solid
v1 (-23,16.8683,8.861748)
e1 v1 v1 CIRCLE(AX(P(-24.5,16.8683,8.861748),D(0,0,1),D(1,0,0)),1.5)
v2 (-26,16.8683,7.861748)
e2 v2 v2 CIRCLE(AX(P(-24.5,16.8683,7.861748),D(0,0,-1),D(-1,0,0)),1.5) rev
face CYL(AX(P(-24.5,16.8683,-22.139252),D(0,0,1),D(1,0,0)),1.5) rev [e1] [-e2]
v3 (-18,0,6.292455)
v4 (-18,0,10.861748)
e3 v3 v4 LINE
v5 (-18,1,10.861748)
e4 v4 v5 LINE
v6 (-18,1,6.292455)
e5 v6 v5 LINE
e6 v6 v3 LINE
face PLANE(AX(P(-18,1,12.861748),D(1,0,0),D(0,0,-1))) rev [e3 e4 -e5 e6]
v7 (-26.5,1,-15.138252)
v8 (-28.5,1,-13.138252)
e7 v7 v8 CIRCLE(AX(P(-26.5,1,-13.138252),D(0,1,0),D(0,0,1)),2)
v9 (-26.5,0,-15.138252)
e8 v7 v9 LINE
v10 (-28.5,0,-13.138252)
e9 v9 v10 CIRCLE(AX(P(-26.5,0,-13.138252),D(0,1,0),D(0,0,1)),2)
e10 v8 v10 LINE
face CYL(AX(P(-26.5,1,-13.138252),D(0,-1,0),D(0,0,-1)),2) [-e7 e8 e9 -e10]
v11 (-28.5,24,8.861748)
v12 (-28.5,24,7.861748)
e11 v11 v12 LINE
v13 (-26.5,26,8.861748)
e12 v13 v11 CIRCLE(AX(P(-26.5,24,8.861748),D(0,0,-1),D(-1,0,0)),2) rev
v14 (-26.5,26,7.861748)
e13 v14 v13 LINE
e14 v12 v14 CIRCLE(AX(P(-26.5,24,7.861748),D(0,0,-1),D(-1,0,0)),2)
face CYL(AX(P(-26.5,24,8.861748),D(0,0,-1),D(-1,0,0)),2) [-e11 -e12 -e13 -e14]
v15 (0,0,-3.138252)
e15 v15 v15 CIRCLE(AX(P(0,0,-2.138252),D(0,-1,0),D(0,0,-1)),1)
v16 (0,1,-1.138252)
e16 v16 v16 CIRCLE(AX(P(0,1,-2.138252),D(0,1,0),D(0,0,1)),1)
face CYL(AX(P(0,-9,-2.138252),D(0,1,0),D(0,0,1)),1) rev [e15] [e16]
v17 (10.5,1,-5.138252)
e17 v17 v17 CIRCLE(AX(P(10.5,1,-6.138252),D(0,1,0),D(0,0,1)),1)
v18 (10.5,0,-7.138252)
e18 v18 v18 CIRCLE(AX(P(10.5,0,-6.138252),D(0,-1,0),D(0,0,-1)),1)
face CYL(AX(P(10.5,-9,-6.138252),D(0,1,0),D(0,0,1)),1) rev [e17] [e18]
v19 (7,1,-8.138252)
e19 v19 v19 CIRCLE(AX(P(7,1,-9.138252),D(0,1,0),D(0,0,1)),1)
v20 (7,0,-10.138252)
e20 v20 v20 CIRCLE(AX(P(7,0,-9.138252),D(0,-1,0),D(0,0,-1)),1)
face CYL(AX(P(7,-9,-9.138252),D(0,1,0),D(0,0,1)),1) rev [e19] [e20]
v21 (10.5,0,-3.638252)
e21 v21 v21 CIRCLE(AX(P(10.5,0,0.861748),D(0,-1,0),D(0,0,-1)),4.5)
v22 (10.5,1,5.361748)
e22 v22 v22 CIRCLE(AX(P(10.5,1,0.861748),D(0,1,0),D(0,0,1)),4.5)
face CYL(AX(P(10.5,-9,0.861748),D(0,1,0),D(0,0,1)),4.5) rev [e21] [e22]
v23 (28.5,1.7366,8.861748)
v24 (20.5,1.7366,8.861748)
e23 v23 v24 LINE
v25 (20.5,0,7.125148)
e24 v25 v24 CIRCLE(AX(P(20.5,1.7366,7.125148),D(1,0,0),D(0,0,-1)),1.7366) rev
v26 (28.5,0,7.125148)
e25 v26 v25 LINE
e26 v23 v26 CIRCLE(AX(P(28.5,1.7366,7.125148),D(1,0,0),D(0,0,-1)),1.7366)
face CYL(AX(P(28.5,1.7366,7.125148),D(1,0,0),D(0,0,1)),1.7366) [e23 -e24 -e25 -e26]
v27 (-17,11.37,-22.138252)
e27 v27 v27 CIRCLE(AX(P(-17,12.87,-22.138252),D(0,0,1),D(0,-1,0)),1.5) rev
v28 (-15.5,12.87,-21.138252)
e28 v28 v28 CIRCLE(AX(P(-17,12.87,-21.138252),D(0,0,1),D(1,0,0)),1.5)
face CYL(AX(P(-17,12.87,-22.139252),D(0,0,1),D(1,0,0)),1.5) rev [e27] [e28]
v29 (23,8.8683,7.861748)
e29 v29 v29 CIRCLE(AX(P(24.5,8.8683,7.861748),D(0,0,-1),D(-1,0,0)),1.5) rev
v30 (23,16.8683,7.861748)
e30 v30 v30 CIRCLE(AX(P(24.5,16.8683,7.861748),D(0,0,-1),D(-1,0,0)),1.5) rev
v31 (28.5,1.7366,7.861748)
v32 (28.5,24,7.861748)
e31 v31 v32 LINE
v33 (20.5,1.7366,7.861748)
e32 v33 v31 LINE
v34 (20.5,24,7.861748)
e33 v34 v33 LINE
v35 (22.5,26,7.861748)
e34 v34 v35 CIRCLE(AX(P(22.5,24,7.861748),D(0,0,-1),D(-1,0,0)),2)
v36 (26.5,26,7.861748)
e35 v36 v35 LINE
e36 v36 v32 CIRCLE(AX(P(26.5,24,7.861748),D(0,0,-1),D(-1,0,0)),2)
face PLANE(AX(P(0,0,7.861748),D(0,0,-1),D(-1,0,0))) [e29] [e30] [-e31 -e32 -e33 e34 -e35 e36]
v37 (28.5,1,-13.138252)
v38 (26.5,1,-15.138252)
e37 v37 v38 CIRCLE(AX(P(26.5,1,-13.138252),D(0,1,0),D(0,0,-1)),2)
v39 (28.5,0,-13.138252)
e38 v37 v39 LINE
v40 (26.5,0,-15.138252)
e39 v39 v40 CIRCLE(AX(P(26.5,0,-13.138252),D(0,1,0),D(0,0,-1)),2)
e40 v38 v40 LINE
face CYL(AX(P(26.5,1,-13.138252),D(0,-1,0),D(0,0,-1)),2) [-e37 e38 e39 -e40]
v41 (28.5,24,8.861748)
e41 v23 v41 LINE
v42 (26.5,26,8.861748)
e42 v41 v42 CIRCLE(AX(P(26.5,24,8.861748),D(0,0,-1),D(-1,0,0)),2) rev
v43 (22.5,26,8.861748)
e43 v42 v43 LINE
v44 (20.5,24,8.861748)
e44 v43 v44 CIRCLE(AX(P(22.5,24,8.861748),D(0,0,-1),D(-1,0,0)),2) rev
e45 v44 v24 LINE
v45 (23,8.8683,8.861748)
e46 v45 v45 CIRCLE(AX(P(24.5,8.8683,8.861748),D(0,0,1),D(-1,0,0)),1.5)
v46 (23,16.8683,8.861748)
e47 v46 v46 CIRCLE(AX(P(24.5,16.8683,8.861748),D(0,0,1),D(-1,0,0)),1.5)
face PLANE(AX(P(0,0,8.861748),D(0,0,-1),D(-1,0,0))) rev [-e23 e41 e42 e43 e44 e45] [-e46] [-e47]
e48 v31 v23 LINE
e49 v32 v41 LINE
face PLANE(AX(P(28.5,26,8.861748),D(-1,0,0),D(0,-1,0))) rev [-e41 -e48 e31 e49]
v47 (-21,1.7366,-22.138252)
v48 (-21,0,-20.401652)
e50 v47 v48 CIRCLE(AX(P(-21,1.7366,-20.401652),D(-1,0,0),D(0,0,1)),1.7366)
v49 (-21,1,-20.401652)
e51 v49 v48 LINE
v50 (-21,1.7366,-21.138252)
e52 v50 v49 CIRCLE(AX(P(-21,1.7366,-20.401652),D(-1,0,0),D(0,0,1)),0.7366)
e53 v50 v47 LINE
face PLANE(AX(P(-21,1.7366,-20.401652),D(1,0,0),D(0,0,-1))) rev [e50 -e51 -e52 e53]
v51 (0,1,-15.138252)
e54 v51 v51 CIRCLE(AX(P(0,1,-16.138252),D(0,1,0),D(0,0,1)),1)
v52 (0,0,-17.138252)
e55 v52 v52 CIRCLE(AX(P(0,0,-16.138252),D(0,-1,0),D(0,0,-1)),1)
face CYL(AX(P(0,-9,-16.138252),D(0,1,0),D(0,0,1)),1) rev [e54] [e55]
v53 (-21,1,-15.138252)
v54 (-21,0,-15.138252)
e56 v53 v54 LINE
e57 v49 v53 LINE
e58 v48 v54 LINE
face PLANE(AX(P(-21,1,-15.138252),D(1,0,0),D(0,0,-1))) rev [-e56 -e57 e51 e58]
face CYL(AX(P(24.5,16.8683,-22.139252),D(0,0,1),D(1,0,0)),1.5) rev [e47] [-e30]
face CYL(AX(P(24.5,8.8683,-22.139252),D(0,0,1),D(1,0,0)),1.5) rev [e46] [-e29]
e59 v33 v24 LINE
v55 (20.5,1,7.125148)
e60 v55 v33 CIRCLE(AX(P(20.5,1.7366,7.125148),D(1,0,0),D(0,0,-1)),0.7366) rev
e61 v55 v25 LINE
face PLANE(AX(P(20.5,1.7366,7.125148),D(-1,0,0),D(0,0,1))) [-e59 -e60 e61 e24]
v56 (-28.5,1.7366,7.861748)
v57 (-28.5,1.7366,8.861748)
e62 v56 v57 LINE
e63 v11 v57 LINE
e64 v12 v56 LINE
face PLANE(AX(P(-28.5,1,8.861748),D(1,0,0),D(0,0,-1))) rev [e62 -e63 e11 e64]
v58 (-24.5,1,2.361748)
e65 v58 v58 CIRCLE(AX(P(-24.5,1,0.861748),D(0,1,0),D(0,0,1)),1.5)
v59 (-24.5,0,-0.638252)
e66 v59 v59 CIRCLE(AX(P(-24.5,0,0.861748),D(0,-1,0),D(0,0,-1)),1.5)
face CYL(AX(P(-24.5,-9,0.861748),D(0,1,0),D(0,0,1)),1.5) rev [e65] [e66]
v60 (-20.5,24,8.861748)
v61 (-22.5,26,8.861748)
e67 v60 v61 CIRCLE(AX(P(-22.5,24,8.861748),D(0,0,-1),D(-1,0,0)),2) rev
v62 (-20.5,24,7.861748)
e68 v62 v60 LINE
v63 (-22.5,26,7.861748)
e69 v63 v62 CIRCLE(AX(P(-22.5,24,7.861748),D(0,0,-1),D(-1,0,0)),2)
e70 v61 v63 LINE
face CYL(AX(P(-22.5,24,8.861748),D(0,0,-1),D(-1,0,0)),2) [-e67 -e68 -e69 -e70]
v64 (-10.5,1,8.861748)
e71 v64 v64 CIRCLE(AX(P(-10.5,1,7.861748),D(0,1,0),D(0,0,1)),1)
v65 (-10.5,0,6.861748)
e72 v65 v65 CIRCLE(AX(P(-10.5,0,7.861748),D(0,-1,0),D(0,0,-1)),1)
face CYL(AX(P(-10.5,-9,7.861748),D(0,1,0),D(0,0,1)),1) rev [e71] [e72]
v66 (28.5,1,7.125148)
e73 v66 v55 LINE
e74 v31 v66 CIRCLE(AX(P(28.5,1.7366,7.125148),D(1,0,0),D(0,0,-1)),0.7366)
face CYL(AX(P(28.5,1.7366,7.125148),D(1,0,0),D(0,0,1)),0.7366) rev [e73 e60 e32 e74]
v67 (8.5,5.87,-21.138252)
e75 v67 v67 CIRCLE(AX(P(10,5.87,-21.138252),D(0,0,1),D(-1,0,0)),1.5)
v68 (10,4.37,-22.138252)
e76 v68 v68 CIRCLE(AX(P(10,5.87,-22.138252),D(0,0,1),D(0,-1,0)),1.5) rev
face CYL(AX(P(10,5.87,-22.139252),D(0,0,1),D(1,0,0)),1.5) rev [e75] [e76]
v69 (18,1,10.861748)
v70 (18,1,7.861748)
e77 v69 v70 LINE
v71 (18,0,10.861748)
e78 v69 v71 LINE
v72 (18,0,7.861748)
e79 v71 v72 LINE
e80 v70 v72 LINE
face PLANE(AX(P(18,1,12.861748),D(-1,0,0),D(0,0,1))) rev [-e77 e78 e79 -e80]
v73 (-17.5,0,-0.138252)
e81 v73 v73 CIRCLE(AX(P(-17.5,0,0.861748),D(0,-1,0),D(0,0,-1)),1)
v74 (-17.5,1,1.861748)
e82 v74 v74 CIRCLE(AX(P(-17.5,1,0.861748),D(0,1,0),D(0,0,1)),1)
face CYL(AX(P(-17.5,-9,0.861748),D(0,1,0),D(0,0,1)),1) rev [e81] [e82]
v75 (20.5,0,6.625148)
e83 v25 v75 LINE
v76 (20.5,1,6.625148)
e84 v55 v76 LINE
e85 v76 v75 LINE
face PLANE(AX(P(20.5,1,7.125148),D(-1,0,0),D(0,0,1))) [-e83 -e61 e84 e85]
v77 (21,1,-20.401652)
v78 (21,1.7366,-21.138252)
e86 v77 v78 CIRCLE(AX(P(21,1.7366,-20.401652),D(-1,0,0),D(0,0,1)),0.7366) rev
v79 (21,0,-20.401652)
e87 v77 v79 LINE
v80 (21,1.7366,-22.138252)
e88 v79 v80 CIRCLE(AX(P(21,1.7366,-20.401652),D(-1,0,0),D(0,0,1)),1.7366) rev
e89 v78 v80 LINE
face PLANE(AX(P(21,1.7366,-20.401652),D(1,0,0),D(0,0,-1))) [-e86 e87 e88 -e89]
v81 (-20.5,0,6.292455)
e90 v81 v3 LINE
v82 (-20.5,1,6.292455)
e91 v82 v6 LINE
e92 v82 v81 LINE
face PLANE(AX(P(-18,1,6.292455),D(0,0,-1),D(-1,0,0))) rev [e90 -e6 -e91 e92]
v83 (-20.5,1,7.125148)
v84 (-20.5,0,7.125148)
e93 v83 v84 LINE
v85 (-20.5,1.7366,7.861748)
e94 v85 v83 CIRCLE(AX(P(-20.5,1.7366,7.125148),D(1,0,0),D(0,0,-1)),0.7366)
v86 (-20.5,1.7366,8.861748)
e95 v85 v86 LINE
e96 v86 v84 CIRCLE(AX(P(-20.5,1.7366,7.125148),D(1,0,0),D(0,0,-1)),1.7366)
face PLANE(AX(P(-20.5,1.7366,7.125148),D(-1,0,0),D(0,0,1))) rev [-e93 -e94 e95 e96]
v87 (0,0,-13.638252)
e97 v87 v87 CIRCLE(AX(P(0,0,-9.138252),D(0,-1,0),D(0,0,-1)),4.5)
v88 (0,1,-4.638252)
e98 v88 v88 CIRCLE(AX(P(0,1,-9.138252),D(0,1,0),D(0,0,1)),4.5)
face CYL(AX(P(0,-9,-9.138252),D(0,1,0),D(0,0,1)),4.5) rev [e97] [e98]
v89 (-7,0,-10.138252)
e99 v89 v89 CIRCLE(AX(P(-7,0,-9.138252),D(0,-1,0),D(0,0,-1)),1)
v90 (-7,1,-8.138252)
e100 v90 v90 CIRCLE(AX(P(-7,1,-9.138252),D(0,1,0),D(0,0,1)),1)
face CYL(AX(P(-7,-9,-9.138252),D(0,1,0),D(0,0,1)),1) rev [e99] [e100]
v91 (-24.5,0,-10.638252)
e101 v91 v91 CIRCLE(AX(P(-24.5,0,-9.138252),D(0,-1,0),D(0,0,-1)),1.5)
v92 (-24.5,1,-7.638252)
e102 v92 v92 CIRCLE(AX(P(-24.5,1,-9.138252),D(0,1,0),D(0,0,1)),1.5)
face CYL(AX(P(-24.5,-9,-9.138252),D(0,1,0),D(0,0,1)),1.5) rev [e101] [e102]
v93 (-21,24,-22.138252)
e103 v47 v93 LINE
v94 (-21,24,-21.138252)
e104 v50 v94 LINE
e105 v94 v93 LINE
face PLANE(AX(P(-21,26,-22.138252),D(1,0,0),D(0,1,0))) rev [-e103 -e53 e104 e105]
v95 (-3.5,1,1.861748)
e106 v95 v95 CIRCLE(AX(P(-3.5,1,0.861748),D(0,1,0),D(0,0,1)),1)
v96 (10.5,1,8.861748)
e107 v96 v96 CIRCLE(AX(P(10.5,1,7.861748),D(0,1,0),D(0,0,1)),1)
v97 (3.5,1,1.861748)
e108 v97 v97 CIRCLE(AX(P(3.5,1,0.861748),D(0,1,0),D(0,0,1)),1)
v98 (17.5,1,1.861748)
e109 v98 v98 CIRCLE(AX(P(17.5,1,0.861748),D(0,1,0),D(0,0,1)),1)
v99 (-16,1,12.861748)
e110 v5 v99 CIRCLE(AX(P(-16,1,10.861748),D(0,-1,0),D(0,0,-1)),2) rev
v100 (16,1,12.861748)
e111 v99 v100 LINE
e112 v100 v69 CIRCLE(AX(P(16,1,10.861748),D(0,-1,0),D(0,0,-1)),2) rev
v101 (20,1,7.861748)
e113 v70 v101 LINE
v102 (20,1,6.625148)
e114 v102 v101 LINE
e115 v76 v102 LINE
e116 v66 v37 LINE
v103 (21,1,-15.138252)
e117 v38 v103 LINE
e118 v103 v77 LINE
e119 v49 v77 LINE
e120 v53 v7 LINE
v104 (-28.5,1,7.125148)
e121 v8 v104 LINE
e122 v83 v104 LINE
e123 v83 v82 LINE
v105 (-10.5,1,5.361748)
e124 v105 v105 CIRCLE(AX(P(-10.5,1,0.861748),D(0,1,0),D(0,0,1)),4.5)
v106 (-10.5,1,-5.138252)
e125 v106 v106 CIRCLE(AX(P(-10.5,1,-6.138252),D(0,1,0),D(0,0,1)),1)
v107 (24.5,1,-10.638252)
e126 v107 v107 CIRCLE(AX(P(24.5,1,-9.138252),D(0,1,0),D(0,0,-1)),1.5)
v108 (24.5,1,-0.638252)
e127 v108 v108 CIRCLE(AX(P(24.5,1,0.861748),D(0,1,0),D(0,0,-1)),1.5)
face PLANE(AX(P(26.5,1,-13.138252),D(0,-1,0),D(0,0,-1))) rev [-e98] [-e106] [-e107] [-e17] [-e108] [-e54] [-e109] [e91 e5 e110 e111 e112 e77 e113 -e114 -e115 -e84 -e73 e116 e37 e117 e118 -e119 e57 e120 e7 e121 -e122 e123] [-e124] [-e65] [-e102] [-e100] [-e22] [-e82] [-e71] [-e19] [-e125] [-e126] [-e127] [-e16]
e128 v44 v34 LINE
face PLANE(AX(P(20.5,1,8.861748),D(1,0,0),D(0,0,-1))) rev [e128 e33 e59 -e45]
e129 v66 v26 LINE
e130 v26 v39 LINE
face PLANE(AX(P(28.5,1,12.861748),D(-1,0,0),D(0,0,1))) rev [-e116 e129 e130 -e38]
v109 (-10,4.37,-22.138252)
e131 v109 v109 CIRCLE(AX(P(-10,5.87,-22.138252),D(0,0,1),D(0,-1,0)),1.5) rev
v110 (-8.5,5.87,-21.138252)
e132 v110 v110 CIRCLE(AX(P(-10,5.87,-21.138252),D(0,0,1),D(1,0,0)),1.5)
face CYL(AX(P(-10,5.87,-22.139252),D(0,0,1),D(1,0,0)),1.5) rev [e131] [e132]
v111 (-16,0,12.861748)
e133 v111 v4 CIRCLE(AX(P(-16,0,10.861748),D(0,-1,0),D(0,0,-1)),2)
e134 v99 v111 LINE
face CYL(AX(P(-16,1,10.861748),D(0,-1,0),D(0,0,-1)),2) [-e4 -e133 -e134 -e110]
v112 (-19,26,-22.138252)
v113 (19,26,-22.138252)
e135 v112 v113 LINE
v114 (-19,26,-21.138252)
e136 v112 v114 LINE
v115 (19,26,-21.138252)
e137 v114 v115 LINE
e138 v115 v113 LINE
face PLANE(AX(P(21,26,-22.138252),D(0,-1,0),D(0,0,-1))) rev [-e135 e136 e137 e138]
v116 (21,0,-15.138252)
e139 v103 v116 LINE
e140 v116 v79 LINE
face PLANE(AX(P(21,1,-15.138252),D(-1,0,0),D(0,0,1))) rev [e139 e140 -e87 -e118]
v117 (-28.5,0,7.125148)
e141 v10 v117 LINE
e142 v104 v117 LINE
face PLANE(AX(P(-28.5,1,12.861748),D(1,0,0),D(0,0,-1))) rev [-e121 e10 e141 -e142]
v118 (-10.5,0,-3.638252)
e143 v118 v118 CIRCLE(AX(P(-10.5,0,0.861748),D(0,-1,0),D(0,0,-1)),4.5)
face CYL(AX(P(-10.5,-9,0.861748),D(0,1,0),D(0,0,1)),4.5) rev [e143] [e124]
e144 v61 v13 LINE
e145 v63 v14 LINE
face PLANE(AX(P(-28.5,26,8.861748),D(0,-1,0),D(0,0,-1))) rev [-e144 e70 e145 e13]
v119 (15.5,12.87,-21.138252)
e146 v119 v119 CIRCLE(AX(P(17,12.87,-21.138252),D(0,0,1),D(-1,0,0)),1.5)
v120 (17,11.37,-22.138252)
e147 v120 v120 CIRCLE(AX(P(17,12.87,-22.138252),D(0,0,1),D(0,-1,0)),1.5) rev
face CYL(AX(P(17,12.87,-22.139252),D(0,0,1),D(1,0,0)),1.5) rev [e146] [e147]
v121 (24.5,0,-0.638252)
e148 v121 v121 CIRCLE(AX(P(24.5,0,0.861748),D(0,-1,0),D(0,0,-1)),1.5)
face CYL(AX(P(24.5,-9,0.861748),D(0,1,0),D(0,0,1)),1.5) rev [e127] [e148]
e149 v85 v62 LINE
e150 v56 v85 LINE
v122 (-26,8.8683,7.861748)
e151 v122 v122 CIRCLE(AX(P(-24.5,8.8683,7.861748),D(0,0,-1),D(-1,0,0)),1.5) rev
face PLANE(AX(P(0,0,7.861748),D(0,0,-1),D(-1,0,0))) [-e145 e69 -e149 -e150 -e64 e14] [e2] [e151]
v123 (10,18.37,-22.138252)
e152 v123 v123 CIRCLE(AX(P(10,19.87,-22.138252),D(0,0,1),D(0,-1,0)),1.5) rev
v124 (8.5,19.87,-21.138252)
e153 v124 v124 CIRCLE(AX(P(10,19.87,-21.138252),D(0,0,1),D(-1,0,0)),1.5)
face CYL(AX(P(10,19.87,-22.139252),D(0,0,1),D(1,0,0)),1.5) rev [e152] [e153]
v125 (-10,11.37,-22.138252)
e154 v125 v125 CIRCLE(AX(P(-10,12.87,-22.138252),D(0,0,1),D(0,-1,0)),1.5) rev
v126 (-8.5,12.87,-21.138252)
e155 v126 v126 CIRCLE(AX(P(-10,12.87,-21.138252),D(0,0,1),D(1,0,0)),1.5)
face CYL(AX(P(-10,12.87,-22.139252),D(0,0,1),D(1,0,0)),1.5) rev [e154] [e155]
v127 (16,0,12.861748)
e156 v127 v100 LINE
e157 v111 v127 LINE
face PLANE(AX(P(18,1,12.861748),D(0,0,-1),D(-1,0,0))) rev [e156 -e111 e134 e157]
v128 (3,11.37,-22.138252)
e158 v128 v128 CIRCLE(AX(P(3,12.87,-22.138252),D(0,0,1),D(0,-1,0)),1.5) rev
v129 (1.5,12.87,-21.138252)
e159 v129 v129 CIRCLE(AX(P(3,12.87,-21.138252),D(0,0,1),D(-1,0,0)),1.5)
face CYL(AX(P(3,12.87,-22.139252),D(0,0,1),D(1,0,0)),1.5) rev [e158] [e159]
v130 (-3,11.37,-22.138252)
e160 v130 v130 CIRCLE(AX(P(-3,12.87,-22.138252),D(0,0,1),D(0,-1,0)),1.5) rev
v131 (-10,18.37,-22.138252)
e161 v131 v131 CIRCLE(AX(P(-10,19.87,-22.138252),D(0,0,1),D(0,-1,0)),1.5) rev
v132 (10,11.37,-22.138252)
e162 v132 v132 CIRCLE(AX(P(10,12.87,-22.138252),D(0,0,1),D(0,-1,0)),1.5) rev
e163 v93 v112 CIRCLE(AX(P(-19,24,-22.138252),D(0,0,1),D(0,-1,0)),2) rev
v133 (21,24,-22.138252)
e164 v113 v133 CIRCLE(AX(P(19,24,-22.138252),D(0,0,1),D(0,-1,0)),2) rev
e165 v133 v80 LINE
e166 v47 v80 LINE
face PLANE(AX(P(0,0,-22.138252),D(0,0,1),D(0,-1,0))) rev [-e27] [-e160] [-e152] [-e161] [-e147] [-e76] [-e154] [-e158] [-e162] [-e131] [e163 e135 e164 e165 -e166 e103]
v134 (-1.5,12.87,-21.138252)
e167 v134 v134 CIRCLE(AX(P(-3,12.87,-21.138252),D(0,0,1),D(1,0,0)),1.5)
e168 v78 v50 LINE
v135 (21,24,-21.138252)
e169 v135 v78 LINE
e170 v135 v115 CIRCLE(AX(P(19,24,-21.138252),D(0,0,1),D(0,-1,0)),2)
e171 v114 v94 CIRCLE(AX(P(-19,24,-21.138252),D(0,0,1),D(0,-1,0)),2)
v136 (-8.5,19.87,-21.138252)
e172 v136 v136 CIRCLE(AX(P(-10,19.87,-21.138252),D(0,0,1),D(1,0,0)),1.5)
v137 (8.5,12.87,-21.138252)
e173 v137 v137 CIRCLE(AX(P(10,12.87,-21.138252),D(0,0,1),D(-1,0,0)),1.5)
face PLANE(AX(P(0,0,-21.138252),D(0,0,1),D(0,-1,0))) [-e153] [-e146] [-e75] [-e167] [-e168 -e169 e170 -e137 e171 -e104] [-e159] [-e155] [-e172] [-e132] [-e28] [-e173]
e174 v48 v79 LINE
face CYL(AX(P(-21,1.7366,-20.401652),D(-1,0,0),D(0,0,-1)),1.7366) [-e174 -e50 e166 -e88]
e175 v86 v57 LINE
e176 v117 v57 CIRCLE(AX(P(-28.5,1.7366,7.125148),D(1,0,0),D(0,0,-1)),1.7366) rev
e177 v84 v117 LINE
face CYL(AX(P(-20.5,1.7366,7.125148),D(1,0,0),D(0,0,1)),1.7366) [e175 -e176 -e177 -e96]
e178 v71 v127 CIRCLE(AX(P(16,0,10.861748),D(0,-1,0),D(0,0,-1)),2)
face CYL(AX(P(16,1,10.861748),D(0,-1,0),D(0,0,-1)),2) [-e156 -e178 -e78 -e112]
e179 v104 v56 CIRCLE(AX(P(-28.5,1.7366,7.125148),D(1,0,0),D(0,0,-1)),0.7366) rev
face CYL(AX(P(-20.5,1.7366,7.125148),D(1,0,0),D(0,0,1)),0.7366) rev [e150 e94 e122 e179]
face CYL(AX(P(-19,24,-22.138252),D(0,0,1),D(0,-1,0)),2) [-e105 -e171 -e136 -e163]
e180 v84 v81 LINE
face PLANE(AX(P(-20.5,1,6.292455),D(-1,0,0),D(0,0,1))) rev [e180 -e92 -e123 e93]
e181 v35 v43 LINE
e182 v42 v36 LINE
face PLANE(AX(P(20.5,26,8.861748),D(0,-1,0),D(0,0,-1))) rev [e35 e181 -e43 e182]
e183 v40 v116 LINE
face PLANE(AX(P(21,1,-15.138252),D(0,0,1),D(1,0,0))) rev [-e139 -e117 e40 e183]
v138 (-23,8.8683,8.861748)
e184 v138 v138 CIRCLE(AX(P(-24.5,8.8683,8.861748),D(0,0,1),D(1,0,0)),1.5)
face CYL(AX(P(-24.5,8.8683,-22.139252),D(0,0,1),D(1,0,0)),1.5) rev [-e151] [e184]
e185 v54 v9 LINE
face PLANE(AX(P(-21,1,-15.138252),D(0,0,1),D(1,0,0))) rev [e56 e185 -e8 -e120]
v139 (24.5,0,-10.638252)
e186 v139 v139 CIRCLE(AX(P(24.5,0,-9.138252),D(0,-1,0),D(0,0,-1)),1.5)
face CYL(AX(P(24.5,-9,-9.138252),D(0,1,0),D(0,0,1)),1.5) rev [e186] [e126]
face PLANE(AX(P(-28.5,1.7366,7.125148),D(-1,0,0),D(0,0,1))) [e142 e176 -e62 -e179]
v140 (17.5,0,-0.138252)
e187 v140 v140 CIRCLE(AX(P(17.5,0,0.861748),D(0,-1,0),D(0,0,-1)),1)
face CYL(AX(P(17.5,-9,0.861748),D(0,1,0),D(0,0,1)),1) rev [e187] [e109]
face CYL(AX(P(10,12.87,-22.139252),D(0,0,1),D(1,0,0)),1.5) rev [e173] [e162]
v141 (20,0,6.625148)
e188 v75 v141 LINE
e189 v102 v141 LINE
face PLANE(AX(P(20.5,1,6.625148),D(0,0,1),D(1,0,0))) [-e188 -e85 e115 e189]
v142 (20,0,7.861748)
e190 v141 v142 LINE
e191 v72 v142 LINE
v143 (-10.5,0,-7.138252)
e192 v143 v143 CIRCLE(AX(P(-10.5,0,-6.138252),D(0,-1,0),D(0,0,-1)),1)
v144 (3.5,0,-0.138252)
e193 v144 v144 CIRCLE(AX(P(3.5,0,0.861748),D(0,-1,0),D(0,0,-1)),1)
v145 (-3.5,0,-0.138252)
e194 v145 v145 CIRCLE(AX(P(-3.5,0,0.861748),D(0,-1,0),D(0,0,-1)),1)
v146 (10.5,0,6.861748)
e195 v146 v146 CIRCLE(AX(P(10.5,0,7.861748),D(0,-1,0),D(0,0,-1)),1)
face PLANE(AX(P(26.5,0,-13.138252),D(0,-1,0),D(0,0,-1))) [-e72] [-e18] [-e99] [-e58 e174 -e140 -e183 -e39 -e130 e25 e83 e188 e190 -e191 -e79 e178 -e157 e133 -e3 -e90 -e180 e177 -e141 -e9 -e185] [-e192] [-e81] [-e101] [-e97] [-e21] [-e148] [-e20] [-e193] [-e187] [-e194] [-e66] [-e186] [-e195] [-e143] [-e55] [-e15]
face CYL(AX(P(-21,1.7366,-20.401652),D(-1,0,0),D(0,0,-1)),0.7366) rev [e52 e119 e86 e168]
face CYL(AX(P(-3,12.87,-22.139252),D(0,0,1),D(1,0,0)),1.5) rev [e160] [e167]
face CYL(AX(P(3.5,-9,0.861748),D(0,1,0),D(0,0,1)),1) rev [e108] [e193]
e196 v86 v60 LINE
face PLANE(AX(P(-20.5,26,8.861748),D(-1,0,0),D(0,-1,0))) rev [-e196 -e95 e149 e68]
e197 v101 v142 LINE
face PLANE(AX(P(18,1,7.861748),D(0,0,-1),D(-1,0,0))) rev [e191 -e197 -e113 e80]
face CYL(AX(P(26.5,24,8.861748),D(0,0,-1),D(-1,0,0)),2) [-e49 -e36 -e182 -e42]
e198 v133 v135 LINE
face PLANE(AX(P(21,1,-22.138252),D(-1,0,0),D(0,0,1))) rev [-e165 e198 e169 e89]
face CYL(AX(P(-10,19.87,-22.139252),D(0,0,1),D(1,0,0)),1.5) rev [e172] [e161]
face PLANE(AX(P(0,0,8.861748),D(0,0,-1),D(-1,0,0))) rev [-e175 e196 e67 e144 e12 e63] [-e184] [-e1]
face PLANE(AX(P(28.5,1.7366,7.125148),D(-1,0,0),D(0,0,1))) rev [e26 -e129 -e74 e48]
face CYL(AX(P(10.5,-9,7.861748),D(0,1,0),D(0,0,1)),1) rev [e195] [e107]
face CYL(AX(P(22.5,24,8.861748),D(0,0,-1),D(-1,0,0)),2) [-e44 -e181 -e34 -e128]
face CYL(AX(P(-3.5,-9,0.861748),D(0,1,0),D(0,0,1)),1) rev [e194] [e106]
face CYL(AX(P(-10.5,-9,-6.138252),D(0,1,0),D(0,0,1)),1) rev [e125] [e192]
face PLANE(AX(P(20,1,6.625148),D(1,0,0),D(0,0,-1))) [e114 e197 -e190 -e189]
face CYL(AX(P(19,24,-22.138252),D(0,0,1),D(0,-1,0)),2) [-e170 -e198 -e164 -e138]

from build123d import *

# Parameters (mm, degrees)
BASE_FLANGE1_DEPTH             = 1
SKETCH15_R                     = 4.5
SKETCH15_R_2                   = 1
SKETCH15_R_3                   = 1.5
CUT_EXTRUDE1_DEPTH             = 10
EDGE_FLANGE2_STRIP_W           = 5.4732
EDGE_FLANGE2_STRIP_H           = 1
EDGE_FLANGE2_STRIP_CUT_DEPTH   = 42
EDGE_FLANGE2_DEPTH             = 42
EDGE_FLANGE3_STRIP_W           = 9.4732
EDGE_FLANGE3_STRIP_H           = 1
EDGE_FLANGE3_STRIP_CUT_DEPTH   = 8
EDGE_FLANGE3_STRIP_2_W         = 9.4732
EDGE_FLANGE3_STRIP_2_H         = 1
EDGE_FLANGE3_STRIP_CUT_2_DEPTH = 8
EDGE_FLANGE3_RELIEF_W          = 9.9732
EDGE_FLANGE3_RELIEF_H          = 0.5
EDGE_FLANGE3_RELIEF_CUT_DEPTH  = 1
EDGE_FLANGE3_DEPTH             = 8
EDGE_FLANGE3_BEND_DEPTH        = 8
FILLET2_R                      = 2
CUT_EXTRUDE2_REACH             = 53.422
SKETCH51_R                     = 1.5
CUT_EXTRUDE3_REACH             = 51.49
SKETCH52_R                     = 1.5


# Sheet-metal steps are written as plain solids
with BuildPart() as part:
    # Sketch1 → Base-Flange1 (new body)
    with BuildSketch(Plane(origin=(0, 0, 0), x_dir=(1, 0, 0), z_dir=(0, 1, 0))):
        with BuildLine():
            Line((28.5, -12.861747752), (20.5, -12.861747752))
            Line((20.5, -12.861747752), (20.5, -7.861747752))
            Line((20.5, -7.861747752), (18, -7.861747752))
            Line((18, -7.861747752), (18, -12.861747752))
            Line((18, -12.861747752), (-18, -12.861747752))
            Line((-18, -12.861747752), (-18, -6.292454879))
            Line((-18, -6.292454879), (-20.5, -6.292454879))
            Line((-20.5, -6.292454879), (-20.5, -12.861747752))
            Line((-20.5, -12.861747752), (-28.5, -12.861747752))
            Line((-28.5, -12.861747752), (-28.5, 13.138252248))
            ThreePointArc((-28.5, 13.138252248), (-27.914213562, 14.552465811), (-26.5, 15.138252248))
            Line((-26.5, 15.138252248), (-21, 15.138252248))
            Line((-21, 15.138252248), (-21, 22.138252248))
            Line((-21, 22.138252248), (21, 22.138252248))
            Line((21, 22.138252248), (21, 15.138252248))
            Line((21, 15.138252248), (26.5, 15.138252248))
            ThreePointArc((26.5, 15.138252248), (27.914213562, 14.552465811), (28.5, 13.138252248))
            Line((28.5, 13.138252248), (28.5, -12.861747752))
        make_face()
    extrude(amount=BASE_FLANGE1_DEPTH)

    # Sketch15 → Cut-Extrude1 (cut)
    with BuildSketch(Plane(origin=(0, 1, 0), x_dir=(1, 0, 0), z_dir=(0, 1, 0))):
        with Locations(Location((-10.5, -0.861747752, 0), (0, 0, 270))):
            Circle(SKETCH15_R)
        with Locations(Location((10.5, -0.861747752, 0), (0, 0, 270))):
            Circle(SKETCH15_R)
        with Locations(Location((-10.5, 6.138252248, 0), (0, 0, 270))):
            Circle(SKETCH15_R_2)
        with Locations(Location((-10.5, -7.861747752, 0), (0, 0, 270))):
            Circle(SKETCH15_R_2)
        with Locations(Location((-17.5, -0.861747752, 0), (0, 0, 270))):
            Circle(SKETCH15_R_2)
        with Locations(Location((-3.5, -0.861747752, 0), (0, 0, 270))):
            Circle(SKETCH15_R_2)
        with Locations(Location((3.5, -0.861747752, 0), (0, 0, 270))):
            Circle(SKETCH15_R_2)
        with Locations(Location((17.5, -0.861747752, 0), (0, 0, 270))):
            Circle(SKETCH15_R_2)
        with Locations(Location((10.5, -7.861747752, 0), (0, 0, 270))):
            Circle(SKETCH15_R_2)
        with Locations(Location((10.5, 6.138252248, 0), (0, 0, 270))):
            Circle(SKETCH15_R_2)
        with Locations(Location((0, 9.138252248, 0), (0, 0, 270))):
            Circle(SKETCH15_R)
        with Locations(Location((0, 2.138252248, 0), (0, 0, 270))):
            Circle(SKETCH15_R_2)
        with Locations(Location((-7, 9.138252248, 0), (0, 0, 270))):
            Circle(SKETCH15_R_2)
        with Locations(Location((7, 9.138252248, 0), (0, 0, 270))):
            Circle(SKETCH15_R_2)
        with Locations(Location((0, 16.138252248, 0), (0, 0, 270))):
            Circle(SKETCH15_R_2)
        with Locations(Location((-24.5, 9.138252248, 0), (0, 0, 270))):
            Circle(SKETCH15_R_3)
        with Locations(Location((-24.5, -0.861747752, 0), (0, 0, 270))):
            Circle(SKETCH15_R_3)
        with Locations(Location((24.5, -0.861747752, 0), (0, 0, 90))):
            Circle(SKETCH15_R_3)
        with Locations(Location((24.5, 9.138252248, 0), (0, 0, 90))):
            Circle(SKETCH15_R_3)
    extrude(amount=-CUT_EXTRUDE1_DEPTH, mode=Mode.SUBTRACT)

    # Edge-Flange2 strip (across the edge) → Edge-Flange2 strip cut (cut)
    with BuildSketch(Plane(origin=(21, 1, -22.138252248), x_dir=(0, 0, 1), z_dir=(-1, 0, 0))):
        with Locations((-1, -0.5)):
            Rectangle(EDGE_FLANGE2_STRIP_W, EDGE_FLANGE2_STRIP_H)
    extrude(amount=EDGE_FLANGE2_STRIP_CUT_DEPTH, mode=Mode.SUBTRACT)

    # Edge-Flange2 section (across the edge) → Edge-Flange2 (add)
    with BuildSketch(Plane(origin=(21, 1, -22.138252248), x_dir=(0, 0, 1), z_dir=(-1, 0, 0))):
        with BuildLine():
            Line((0, 0.7366), (0, 25))
            Line((0, 25), (1, 25))
            Line((1, 25), (1, 0.7366))
            ThreePointArc((1, 0.7366), (1.215745145, 0.215745145), (1.7366, 0))
            Line((1.7366, 0), (1.7366, -1))
            ThreePointArc((1.7366, -1), (0.508638364, -0.491361636), (0, 0.7366))
        make_face()
    extrude(amount=EDGE_FLANGE2_DEPTH)

    # Edge-Flange3 strip (across the edge) → Edge-Flange3 strip cut (cut)
    with BuildSketch(Plane(origin=(-28.5, 1, 8.861747752), x_dir=(0, 0, -1), z_dir=(1, 0, 0))):
        with Locations((-3, -0.5)):
            Rectangle(EDGE_FLANGE3_STRIP_W, EDGE_FLANGE3_STRIP_H)
    extrude(amount=EDGE_FLANGE3_STRIP_CUT_DEPTH, mode=Mode.SUBTRACT)

    # Edge-Flange3 strip 2 (across the edge) → Edge-Flange3 strip cut 2 (cut)
    with BuildSketch(Plane(origin=(20.5, 1, 8.861747752), x_dir=(0, 0, -1), z_dir=(1, 0, 0))):
        with Locations((-3, -0.5)):
            Rectangle(EDGE_FLANGE3_STRIP_2_W, EDGE_FLANGE3_STRIP_2_H)
    extrude(amount=EDGE_FLANGE3_STRIP_CUT_2_DEPTH, mode=Mode.SUBTRACT)

    # Edge-Flange3 relief (on the sheet) → Edge-Flange3 relief cut (cut)
    with BuildSketch(Plane(origin=(20.5, 1, 7.125147752), x_dir=(0, 0, -1), z_dir=(0, 1, 0))):
        with Locations((-4.4866, 0.25)):
            Rectangle(EDGE_FLANGE3_RELIEF_W, EDGE_FLANGE3_RELIEF_H)
    extrude(amount=-EDGE_FLANGE3_RELIEF_CUT_DEPTH, mode=Mode.SUBTRACT)

    # Edge-Flange3 section (across the edge) → Edge-Flange3 (add)
    with BuildSketch(Plane(origin=(-28.5, 1, 8.861747752), x_dir=(0, 0, -1), z_dir=(1, 0, 0))):
        with BuildLine():
            Line((0, 0.7366), (0, 25))
            Line((0, 25), (1, 25))
            Line((1, 25), (1, 0.7366))
            ThreePointArc((1, 0.7366), (1.215745145, 0.215745145), (1.7366, 0))
            Line((1.7366, 0), (1.7366, -1))
            ThreePointArc((1.7366, -1), (0.508638364, -0.491361636), (0, 0.7366))
        make_face()
    extrude(amount=EDGE_FLANGE3_DEPTH)

    # Edge-Flange3 section 2 (across the edge) → Edge-Flange3 bend (add)
    with BuildSketch(Plane(origin=(20.5, 1, 8.861747752), x_dir=(0, 0, -1), z_dir=(1, 0, 0))):
        with BuildLine():
            Line((0, 0.7366), (0, 25))
            Line((0, 25), (1, 25))
            Line((1, 25), (1, 0.7366))
            ThreePointArc((1, 0.7366), (1.215745145, 0.215745145), (1.7366, 0))
            Line((1.7366, 0), (1.7366, -1))
            ThreePointArc((1.7366, -1), (0.508638364, -0.491361636), (0, 0.7366))
        make_face()
    extrude(amount=EDGE_FLANGE3_BEND_DEPTH)

    # Fillet2
    fillet2_edges = [part.edges().sort_by_distance(p)[0] for p in [
        (21, 26, -21.638252248),
        (-21, 26, -21.638252248),
        (-28.5, 26, 8.361747752),
        (-20.5, 26, 8.361747752),
        (20.5, 26, 8.361747752),
        (28.5, 26, 8.361747752),
        (18, 0.5, 12.861747752),
        (-18, 0.5, 12.861747752),
    ]]
    fillet(fillet2_edges, radius=FILLET2_R)

    # Sketch51 → Cut-Extrude2 (cut, up to next)
    with BuildSketch(Plane.XY.offset(-21.138252248), mode=Mode.PRIVATE) as cut_extrude2_sk1:
        with Locations((-10, 12.87)):
            Circle(SKETCH51_R)
    cut_extrude2_tool1 = extrude(cut_extrude2_sk1.sketch, amount=-CUT_EXTRUDE2_REACH, mode=Mode.PRIVATE) & part.part
    # Sketch51 → Cut-Extrude2 (cut, up to next)
    with BuildSketch(Plane.XY.offset(-21.138252248), mode=Mode.PRIVATE) as cut_extrude2_sk2:
        with Locations((-10, 19.87)):
            Circle(SKETCH51_R)
    cut_extrude2_tool2 = extrude(cut_extrude2_sk2.sketch, amount=-CUT_EXTRUDE2_REACH, mode=Mode.PRIVATE) & part.part
    # Sketch51 → Cut-Extrude2 (cut, up to next)
    with BuildSketch(Plane.XY.offset(-21.138252248), mode=Mode.PRIVATE) as cut_extrude2_sk3:
        with Locations((-17, 12.87)):
            Circle(SKETCH51_R)
    cut_extrude2_tool3 = extrude(cut_extrude2_sk3.sketch, amount=-CUT_EXTRUDE2_REACH, mode=Mode.PRIVATE) & part.part
    # Sketch51 → Cut-Extrude2 (cut, up to next)
    with BuildSketch(Plane.XY.offset(-21.138252248), mode=Mode.PRIVATE) as cut_extrude2_sk4:
        with Locations((-3, 12.87)):
            Circle(SKETCH51_R)
    cut_extrude2_tool4 = extrude(cut_extrude2_sk4.sketch, amount=-CUT_EXTRUDE2_REACH, mode=Mode.PRIVATE) & part.part
    # Sketch51 → Cut-Extrude2 (cut, up to next)
    with BuildSketch(Plane.XY.offset(-21.138252248), mode=Mode.PRIVATE) as cut_extrude2_sk5:
        with Locations((-10, 5.87)):
            Circle(SKETCH51_R)
    cut_extrude2_tool5 = extrude(cut_extrude2_sk5.sketch, amount=-CUT_EXTRUDE2_REACH, mode=Mode.PRIVATE) & part.part
    # Sketch51 → Cut-Extrude2 (cut, up to next)
    with BuildSketch(Plane.XY.offset(-21.138252248), mode=Mode.PRIVATE) as cut_extrude2_sk6:
        with Locations(Location((10, 5.87, 0), (0, 0, 270))):
            Circle(SKETCH51_R)
    cut_extrude2_tool6 = extrude(cut_extrude2_sk6.sketch, amount=-CUT_EXTRUDE2_REACH, mode=Mode.PRIVATE) & part.part
    # Sketch51 → Cut-Extrude2 (cut, up to next)
    with BuildSketch(Plane.XY.offset(-21.138252248), mode=Mode.PRIVATE) as cut_extrude2_sk7:
        with Locations(Location((3, 12.87, 0), (0, 0, 270))):
            Circle(SKETCH51_R)
    cut_extrude2_tool7 = extrude(cut_extrude2_sk7.sketch, amount=-CUT_EXTRUDE2_REACH, mode=Mode.PRIVATE) & part.part
    # Sketch51 → Cut-Extrude2 (cut, up to next)
    with BuildSketch(Plane.XY.offset(-21.138252248), mode=Mode.PRIVATE) as cut_extrude2_sk8:
        with Locations(Location((17, 12.87, 0), (0, 0, 270))):
            Circle(SKETCH51_R)
    cut_extrude2_tool8 = extrude(cut_extrude2_sk8.sketch, amount=-CUT_EXTRUDE2_REACH, mode=Mode.PRIVATE) & part.part
    # Sketch51 → Cut-Extrude2 (cut, up to next)
    with BuildSketch(Plane.XY.offset(-21.138252248), mode=Mode.PRIVATE) as cut_extrude2_sk9:
        with Locations(Location((10, 19.87, 0), (0, 0, 270))):
            Circle(SKETCH51_R)
    cut_extrude2_tool9 = extrude(cut_extrude2_sk9.sketch, amount=-CUT_EXTRUDE2_REACH, mode=Mode.PRIVATE) & part.part
    # Sketch51 → Cut-Extrude2 (cut, up to next)
    with BuildSketch(Plane.XY.offset(-21.138252248), mode=Mode.PRIVATE) as cut_extrude2_sk10:
        with Locations(Location((10, 12.87, 0), (0, 0, 270))):
            Circle(SKETCH51_R)
    cut_extrude2_tool10 = extrude(cut_extrude2_sk10.sketch, amount=-CUT_EXTRUDE2_REACH, mode=Mode.PRIVATE) & part.part
    add(cut_extrude2_tool1.solids().sort_by_distance((-10, 12.87, -21.138252))[0], mode=Mode.SUBTRACT)
    add(cut_extrude2_tool2.solids().sort_by_distance((-10, 19.87, -21.138252))[0], mode=Mode.SUBTRACT)
    add(cut_extrude2_tool3.solids().sort_by_distance((-17, 12.87, -21.138252))[0], mode=Mode.SUBTRACT)
    add(cut_extrude2_tool4.solids().sort_by_distance((-3, 12.87, -21.138252))[0], mode=Mode.SUBTRACT)
    add(cut_extrude2_tool5.solids().sort_by_distance((-10, 5.87, -21.138252))[0], mode=Mode.SUBTRACT)
    add(cut_extrude2_tool6.solids().sort_by_distance((10, 5.87, -21.138252))[0], mode=Mode.SUBTRACT)
    add(cut_extrude2_tool7.solids().sort_by_distance((3, 12.87, -21.138252))[0], mode=Mode.SUBTRACT)
    add(cut_extrude2_tool8.solids().sort_by_distance((17, 12.87, -21.138252))[0], mode=Mode.SUBTRACT)
    add(cut_extrude2_tool9.solids().sort_by_distance((10, 19.87, -21.138252))[0], mode=Mode.SUBTRACT)
    add(cut_extrude2_tool10.solids().sort_by_distance((10, 12.87, -21.138252))[0], mode=Mode.SUBTRACT)

    # Sketch52 → Cut-Extrude3 (cut, up to next)
    with BuildSketch(Plane.XY.offset(8.861747752), mode=Mode.PRIVATE) as cut_extrude3_sk1:
        with Locations((-24.5, 16.8683)):
            Circle(SKETCH52_R)
    cut_extrude3_tool1 = extrude(cut_extrude3_sk1.sketch, amount=-CUT_EXTRUDE3_REACH, mode=Mode.PRIVATE) & part.part
    # Sketch52 → Cut-Extrude3 (cut, up to next)
    with BuildSketch(Plane.XY.offset(8.861747752), mode=Mode.PRIVATE) as cut_extrude3_sk2:
        with Locations((-24.5, 8.8683)):
            Circle(SKETCH52_R)
    cut_extrude3_tool2 = extrude(cut_extrude3_sk2.sketch, amount=-CUT_EXTRUDE3_REACH, mode=Mode.PRIVATE) & part.part
    # Sketch52 → Cut-Extrude3 (cut, up to next)
    with BuildSketch(Plane.XY.offset(8.861747752), mode=Mode.PRIVATE) as cut_extrude3_sk3:
        with Locations(Location((24.5, 8.8683, 0), (0, 0, 180))):
            Circle(SKETCH52_R)
    cut_extrude3_tool3 = extrude(cut_extrude3_sk3.sketch, amount=-CUT_EXTRUDE3_REACH, mode=Mode.PRIVATE) & part.part
    # Sketch52 → Cut-Extrude3 (cut, up to next)
    with BuildSketch(Plane.XY.offset(8.861747752), mode=Mode.PRIVATE) as cut_extrude3_sk4:
        with Locations(Location((24.5, 16.8683, 0), (0, 0, 180))):
            Circle(SKETCH52_R)
    cut_extrude3_tool4 = extrude(cut_extrude3_sk4.sketch, amount=-CUT_EXTRUDE3_REACH, mode=Mode.PRIVATE) & part.part
    add(cut_extrude3_tool1.solids().sort_by_distance((-24.5, 16.8683, 8.861748))[0], mode=Mode.SUBTRACT)
    add(cut_extrude3_tool2.solids().sort_by_distance((-24.5, 8.8683, 8.861748))[0], mode=Mode.SUBTRACT)
    add(cut_extrude3_tool3.solids().sort_by_distance((24.5, 8.8683, 8.861748))[0], mode=Mode.SUBTRACT)
    add(cut_extrude3_tool4.solids().sort_by_distance((24.5, 16.8683, 8.861748))[0], mode=Mode.SUBTRACT)


solid = part.part
